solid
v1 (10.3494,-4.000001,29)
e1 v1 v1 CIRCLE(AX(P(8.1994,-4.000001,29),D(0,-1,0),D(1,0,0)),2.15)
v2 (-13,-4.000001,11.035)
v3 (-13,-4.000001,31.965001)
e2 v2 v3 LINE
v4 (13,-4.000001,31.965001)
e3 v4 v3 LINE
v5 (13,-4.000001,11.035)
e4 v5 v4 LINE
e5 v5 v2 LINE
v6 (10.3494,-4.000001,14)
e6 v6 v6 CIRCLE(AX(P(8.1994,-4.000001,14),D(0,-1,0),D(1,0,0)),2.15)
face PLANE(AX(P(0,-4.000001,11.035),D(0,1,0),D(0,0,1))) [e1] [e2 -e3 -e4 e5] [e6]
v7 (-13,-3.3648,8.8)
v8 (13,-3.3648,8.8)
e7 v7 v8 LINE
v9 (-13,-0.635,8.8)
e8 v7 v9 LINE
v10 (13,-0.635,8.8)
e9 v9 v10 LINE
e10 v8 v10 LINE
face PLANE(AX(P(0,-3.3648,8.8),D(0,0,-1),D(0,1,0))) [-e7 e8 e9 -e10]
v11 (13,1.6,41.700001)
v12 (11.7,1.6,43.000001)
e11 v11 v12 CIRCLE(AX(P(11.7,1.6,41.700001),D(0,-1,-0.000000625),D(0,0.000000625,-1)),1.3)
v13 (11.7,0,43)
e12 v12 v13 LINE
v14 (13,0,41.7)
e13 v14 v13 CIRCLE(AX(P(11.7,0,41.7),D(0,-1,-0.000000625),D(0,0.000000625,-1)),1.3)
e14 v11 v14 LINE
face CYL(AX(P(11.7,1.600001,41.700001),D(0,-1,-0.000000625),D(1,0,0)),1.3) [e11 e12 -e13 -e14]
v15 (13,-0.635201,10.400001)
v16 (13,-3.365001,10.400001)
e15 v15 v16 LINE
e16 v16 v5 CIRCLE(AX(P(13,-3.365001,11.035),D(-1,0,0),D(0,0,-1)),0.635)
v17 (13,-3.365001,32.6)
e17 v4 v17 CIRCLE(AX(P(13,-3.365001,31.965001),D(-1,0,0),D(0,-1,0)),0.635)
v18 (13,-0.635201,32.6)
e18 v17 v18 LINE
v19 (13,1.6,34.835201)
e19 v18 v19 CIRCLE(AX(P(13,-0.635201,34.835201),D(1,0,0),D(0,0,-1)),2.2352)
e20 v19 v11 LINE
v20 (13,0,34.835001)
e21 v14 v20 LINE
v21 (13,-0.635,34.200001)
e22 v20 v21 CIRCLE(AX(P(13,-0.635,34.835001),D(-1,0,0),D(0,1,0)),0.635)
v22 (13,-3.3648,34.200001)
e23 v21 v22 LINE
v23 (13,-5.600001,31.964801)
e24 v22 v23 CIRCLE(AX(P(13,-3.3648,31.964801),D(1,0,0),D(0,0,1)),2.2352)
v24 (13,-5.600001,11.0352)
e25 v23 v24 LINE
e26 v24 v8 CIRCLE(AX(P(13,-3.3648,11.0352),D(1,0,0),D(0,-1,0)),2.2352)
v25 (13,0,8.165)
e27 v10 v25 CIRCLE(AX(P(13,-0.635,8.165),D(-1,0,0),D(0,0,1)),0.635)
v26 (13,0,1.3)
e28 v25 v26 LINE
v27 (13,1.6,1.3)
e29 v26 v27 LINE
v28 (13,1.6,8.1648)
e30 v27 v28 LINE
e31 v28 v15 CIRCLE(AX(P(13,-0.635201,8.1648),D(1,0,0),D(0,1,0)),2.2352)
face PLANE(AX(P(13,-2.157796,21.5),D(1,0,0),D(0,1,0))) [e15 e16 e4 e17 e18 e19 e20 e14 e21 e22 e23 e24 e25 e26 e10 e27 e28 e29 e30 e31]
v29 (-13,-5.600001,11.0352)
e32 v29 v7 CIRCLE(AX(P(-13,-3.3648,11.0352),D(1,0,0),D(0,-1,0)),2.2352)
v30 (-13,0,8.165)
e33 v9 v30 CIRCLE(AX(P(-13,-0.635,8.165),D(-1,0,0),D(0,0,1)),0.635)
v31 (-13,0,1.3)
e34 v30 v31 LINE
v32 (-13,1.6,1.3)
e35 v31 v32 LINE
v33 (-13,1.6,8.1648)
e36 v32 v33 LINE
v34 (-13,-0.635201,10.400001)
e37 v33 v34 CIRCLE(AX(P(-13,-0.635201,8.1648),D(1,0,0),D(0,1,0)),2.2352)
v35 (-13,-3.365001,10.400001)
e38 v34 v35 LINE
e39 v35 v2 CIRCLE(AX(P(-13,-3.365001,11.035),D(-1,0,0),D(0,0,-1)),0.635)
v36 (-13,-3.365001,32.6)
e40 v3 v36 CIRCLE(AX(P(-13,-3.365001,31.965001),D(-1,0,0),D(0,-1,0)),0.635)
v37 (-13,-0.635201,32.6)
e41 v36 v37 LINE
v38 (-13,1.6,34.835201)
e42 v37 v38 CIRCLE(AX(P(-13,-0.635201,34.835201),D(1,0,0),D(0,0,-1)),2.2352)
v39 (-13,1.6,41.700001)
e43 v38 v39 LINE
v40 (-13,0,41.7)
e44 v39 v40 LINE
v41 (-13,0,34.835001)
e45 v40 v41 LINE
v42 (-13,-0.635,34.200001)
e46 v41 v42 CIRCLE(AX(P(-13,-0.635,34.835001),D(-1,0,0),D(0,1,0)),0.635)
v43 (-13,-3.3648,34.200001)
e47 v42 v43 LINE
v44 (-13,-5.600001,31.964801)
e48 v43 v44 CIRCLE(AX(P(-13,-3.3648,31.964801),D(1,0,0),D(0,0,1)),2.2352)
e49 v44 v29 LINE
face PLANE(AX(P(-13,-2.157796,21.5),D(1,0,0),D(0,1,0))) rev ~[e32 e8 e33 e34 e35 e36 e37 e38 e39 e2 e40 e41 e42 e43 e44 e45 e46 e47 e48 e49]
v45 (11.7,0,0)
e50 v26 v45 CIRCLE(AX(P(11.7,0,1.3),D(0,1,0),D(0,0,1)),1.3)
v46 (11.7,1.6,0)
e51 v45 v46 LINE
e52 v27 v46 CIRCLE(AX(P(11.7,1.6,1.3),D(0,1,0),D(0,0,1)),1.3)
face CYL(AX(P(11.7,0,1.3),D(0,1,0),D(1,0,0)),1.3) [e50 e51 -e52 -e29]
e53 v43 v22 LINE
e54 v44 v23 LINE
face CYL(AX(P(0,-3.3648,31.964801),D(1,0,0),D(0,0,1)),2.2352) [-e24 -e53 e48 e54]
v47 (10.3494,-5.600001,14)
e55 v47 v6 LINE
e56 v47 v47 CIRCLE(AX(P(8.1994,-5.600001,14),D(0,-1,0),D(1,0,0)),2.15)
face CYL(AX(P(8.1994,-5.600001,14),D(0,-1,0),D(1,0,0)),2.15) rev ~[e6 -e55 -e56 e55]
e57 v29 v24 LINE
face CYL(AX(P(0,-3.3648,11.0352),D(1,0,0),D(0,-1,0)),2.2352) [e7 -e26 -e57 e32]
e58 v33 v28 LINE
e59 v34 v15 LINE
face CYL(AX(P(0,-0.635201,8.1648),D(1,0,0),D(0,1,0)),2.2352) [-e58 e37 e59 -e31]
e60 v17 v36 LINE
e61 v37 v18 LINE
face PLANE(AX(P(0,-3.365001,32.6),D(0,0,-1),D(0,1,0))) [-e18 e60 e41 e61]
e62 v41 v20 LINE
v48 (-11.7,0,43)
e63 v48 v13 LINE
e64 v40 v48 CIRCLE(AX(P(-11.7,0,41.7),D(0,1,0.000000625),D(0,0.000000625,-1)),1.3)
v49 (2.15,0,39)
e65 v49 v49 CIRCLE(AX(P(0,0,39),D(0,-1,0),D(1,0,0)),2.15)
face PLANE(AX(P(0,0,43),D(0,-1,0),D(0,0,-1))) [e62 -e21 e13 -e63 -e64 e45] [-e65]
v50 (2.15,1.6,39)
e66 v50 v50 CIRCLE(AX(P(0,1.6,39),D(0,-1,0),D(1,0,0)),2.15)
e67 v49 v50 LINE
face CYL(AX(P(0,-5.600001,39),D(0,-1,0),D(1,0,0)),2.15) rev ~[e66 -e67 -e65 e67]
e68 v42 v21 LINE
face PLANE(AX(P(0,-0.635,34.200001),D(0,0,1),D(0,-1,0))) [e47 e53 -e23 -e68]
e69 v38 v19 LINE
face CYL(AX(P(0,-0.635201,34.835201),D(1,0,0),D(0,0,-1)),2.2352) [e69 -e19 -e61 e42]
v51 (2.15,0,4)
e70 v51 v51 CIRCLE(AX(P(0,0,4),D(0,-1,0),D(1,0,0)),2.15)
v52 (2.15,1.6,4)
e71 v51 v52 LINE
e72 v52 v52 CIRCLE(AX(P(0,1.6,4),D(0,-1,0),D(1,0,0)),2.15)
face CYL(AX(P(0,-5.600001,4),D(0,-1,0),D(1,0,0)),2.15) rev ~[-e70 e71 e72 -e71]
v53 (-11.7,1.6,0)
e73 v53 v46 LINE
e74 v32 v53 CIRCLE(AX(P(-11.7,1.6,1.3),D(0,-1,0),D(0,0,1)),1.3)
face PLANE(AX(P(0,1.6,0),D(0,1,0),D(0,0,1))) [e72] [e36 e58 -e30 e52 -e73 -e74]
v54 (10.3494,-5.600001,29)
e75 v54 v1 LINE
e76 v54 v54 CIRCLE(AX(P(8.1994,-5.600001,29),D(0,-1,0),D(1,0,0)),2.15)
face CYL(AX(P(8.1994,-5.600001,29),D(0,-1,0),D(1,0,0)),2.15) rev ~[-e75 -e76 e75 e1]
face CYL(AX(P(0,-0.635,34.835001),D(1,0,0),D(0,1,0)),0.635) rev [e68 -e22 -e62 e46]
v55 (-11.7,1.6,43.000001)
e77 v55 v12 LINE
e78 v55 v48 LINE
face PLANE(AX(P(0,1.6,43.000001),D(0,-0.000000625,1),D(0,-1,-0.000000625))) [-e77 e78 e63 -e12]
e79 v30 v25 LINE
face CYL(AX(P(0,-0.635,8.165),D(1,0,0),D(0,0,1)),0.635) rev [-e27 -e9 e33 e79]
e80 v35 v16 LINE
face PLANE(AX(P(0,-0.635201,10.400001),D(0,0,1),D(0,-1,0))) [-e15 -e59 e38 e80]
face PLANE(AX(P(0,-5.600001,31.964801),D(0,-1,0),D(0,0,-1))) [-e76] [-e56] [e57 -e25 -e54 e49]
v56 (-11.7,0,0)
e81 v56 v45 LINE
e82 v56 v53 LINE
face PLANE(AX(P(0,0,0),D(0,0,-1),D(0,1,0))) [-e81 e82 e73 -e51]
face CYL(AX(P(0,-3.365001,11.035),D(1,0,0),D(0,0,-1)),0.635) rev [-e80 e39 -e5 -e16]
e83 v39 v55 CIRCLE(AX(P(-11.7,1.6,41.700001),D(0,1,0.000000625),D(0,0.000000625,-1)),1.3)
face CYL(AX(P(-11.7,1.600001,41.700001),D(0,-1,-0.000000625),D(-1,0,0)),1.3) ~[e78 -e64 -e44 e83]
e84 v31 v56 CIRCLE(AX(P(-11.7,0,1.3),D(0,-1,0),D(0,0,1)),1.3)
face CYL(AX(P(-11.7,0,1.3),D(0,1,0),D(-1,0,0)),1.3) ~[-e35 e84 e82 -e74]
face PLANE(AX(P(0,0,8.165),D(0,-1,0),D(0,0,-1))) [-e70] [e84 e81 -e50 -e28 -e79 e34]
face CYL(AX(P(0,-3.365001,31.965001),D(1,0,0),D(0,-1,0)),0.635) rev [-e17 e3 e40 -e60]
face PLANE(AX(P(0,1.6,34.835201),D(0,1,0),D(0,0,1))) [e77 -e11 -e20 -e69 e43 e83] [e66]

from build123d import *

# Parameters (mm, degrees)
F1_DEPTH = 13
F2_R     = 2.15
F3_DEPTH = 7.2010003069
F4_R     = 1.3


# Not quite as in the source:
# - ends of sketch curves that miss each other by under 0.0002 mm in the source are joined


with BuildPart() as f1:
    # F0 (on Right) → F1 (new body, symmetric)
    with BuildSketch(Plane.YZ):
        with BuildLine():
            Line((-3.3650011141, 32.6000002232), (-0.6352006896, 32.6000002232))
            ThreePointArc((-0.6352006896, 32.6000002232), (0.9453246879, 33.2546752703), (1.5999997349, 34.8352006478))
            Line((1.5999997349, 34.8352006478), (1.5999997349, 41.7300015539))
            Line((1.5999997349, 41.7300015539), (1.5999997349, 43.0000009998))
            Line((1.5999997349, 43.0000009998), (0, 43))
            Line((0, 43), (0, 41.7300015539))
            Line((0, 41.7300015539), (0, 34.8350006809))
            ThreePointArc((0, 34.8350006809), (-0.1859871128, 34.3859880708), (-0.634999723, 34.200000958))
            Line((-0.634999723, 34.200000958), (-3.3648001474, 34.200000958))
            ThreePointArc((-3.3648001474, 34.200000958), (-4.945325525, 33.5453259109), (-5.600000572, 31.9648005334))
            Line((-5.600000572, 31.9648005334), (-5.600000572, 11.0352004664))
            ThreePointArc((-5.600000572, 11.0352004664), (-4.945325525, 9.4546750889), (-3.3648001474, 8.8000000419))
            Line((-3.3648001474, 8.8000000419), (-0.634999723, 8.8000000419))
            ThreePointArc((-0.634999723, 8.8000000419), (-0.1859871128, 8.6140129291), (0, 8.1650003189))
            Line((0, 8.1650003189), (0, 1.2700004457))
            Line((0, 1.2700004457), (0, 0))
            Line((0, 0), (1.5999997349, 0))
            Line((1.5999997349, 0), (1.5999997349, 1.2700004457))
            Line((1.5999997349, 1.2700004457), (1.5999997349, 8.1648003521))
            ThreePointArc((1.5999997349, 8.1648003521), (0.9453246879, 9.7453257296), (-0.6352006896, 10.4000007766))
            Line((-0.6352006896, 10.4000007766), (-3.3650011141, 10.4000007766))
            ThreePointArc((-3.3650011141, 10.4000007766), (-3.8140137243, 10.5859878894), (-4.0000008371, 11.0350004996))
            Line((-4.0000008371, 11.0350004996), (-4.0000008371, 31.9650005003))
            ThreePointArc((-4.0000008371, 31.9650005003), (-3.8140137243, 32.4140131104), (-3.3650011141, 32.6000002232))
        make_face()
    extrude(amount=F1_DEPTH, both=True)

    # F2 (on face) → F3 (cut, through all)
    with BuildSketch(Plane.XZ.offset(5.600000572)):
        with Locations((0, 4)):
            Circle(F2_R)
        with Locations((0, 39)):
            Circle(F2_R)
        with Locations((8.1994, 29)):
            Circle(F2_R)
        with Locations((8.1994, 14)):
            Circle(F2_R)
    extrude(amount=-F3_DEPTH, mode=Mode.SUBTRACT)

    # F4
    f4_edges = [f1.edges().sort_by_distance(p)[0] for p in [
        (-13, 0.8, 43),
        (-13, 0.8, 0),
        (13, 0.8, 0),
        (13, 0.8, 43),
    ]]
    fillet(f4_edges, radius=F4_R)


solid = f1.part
